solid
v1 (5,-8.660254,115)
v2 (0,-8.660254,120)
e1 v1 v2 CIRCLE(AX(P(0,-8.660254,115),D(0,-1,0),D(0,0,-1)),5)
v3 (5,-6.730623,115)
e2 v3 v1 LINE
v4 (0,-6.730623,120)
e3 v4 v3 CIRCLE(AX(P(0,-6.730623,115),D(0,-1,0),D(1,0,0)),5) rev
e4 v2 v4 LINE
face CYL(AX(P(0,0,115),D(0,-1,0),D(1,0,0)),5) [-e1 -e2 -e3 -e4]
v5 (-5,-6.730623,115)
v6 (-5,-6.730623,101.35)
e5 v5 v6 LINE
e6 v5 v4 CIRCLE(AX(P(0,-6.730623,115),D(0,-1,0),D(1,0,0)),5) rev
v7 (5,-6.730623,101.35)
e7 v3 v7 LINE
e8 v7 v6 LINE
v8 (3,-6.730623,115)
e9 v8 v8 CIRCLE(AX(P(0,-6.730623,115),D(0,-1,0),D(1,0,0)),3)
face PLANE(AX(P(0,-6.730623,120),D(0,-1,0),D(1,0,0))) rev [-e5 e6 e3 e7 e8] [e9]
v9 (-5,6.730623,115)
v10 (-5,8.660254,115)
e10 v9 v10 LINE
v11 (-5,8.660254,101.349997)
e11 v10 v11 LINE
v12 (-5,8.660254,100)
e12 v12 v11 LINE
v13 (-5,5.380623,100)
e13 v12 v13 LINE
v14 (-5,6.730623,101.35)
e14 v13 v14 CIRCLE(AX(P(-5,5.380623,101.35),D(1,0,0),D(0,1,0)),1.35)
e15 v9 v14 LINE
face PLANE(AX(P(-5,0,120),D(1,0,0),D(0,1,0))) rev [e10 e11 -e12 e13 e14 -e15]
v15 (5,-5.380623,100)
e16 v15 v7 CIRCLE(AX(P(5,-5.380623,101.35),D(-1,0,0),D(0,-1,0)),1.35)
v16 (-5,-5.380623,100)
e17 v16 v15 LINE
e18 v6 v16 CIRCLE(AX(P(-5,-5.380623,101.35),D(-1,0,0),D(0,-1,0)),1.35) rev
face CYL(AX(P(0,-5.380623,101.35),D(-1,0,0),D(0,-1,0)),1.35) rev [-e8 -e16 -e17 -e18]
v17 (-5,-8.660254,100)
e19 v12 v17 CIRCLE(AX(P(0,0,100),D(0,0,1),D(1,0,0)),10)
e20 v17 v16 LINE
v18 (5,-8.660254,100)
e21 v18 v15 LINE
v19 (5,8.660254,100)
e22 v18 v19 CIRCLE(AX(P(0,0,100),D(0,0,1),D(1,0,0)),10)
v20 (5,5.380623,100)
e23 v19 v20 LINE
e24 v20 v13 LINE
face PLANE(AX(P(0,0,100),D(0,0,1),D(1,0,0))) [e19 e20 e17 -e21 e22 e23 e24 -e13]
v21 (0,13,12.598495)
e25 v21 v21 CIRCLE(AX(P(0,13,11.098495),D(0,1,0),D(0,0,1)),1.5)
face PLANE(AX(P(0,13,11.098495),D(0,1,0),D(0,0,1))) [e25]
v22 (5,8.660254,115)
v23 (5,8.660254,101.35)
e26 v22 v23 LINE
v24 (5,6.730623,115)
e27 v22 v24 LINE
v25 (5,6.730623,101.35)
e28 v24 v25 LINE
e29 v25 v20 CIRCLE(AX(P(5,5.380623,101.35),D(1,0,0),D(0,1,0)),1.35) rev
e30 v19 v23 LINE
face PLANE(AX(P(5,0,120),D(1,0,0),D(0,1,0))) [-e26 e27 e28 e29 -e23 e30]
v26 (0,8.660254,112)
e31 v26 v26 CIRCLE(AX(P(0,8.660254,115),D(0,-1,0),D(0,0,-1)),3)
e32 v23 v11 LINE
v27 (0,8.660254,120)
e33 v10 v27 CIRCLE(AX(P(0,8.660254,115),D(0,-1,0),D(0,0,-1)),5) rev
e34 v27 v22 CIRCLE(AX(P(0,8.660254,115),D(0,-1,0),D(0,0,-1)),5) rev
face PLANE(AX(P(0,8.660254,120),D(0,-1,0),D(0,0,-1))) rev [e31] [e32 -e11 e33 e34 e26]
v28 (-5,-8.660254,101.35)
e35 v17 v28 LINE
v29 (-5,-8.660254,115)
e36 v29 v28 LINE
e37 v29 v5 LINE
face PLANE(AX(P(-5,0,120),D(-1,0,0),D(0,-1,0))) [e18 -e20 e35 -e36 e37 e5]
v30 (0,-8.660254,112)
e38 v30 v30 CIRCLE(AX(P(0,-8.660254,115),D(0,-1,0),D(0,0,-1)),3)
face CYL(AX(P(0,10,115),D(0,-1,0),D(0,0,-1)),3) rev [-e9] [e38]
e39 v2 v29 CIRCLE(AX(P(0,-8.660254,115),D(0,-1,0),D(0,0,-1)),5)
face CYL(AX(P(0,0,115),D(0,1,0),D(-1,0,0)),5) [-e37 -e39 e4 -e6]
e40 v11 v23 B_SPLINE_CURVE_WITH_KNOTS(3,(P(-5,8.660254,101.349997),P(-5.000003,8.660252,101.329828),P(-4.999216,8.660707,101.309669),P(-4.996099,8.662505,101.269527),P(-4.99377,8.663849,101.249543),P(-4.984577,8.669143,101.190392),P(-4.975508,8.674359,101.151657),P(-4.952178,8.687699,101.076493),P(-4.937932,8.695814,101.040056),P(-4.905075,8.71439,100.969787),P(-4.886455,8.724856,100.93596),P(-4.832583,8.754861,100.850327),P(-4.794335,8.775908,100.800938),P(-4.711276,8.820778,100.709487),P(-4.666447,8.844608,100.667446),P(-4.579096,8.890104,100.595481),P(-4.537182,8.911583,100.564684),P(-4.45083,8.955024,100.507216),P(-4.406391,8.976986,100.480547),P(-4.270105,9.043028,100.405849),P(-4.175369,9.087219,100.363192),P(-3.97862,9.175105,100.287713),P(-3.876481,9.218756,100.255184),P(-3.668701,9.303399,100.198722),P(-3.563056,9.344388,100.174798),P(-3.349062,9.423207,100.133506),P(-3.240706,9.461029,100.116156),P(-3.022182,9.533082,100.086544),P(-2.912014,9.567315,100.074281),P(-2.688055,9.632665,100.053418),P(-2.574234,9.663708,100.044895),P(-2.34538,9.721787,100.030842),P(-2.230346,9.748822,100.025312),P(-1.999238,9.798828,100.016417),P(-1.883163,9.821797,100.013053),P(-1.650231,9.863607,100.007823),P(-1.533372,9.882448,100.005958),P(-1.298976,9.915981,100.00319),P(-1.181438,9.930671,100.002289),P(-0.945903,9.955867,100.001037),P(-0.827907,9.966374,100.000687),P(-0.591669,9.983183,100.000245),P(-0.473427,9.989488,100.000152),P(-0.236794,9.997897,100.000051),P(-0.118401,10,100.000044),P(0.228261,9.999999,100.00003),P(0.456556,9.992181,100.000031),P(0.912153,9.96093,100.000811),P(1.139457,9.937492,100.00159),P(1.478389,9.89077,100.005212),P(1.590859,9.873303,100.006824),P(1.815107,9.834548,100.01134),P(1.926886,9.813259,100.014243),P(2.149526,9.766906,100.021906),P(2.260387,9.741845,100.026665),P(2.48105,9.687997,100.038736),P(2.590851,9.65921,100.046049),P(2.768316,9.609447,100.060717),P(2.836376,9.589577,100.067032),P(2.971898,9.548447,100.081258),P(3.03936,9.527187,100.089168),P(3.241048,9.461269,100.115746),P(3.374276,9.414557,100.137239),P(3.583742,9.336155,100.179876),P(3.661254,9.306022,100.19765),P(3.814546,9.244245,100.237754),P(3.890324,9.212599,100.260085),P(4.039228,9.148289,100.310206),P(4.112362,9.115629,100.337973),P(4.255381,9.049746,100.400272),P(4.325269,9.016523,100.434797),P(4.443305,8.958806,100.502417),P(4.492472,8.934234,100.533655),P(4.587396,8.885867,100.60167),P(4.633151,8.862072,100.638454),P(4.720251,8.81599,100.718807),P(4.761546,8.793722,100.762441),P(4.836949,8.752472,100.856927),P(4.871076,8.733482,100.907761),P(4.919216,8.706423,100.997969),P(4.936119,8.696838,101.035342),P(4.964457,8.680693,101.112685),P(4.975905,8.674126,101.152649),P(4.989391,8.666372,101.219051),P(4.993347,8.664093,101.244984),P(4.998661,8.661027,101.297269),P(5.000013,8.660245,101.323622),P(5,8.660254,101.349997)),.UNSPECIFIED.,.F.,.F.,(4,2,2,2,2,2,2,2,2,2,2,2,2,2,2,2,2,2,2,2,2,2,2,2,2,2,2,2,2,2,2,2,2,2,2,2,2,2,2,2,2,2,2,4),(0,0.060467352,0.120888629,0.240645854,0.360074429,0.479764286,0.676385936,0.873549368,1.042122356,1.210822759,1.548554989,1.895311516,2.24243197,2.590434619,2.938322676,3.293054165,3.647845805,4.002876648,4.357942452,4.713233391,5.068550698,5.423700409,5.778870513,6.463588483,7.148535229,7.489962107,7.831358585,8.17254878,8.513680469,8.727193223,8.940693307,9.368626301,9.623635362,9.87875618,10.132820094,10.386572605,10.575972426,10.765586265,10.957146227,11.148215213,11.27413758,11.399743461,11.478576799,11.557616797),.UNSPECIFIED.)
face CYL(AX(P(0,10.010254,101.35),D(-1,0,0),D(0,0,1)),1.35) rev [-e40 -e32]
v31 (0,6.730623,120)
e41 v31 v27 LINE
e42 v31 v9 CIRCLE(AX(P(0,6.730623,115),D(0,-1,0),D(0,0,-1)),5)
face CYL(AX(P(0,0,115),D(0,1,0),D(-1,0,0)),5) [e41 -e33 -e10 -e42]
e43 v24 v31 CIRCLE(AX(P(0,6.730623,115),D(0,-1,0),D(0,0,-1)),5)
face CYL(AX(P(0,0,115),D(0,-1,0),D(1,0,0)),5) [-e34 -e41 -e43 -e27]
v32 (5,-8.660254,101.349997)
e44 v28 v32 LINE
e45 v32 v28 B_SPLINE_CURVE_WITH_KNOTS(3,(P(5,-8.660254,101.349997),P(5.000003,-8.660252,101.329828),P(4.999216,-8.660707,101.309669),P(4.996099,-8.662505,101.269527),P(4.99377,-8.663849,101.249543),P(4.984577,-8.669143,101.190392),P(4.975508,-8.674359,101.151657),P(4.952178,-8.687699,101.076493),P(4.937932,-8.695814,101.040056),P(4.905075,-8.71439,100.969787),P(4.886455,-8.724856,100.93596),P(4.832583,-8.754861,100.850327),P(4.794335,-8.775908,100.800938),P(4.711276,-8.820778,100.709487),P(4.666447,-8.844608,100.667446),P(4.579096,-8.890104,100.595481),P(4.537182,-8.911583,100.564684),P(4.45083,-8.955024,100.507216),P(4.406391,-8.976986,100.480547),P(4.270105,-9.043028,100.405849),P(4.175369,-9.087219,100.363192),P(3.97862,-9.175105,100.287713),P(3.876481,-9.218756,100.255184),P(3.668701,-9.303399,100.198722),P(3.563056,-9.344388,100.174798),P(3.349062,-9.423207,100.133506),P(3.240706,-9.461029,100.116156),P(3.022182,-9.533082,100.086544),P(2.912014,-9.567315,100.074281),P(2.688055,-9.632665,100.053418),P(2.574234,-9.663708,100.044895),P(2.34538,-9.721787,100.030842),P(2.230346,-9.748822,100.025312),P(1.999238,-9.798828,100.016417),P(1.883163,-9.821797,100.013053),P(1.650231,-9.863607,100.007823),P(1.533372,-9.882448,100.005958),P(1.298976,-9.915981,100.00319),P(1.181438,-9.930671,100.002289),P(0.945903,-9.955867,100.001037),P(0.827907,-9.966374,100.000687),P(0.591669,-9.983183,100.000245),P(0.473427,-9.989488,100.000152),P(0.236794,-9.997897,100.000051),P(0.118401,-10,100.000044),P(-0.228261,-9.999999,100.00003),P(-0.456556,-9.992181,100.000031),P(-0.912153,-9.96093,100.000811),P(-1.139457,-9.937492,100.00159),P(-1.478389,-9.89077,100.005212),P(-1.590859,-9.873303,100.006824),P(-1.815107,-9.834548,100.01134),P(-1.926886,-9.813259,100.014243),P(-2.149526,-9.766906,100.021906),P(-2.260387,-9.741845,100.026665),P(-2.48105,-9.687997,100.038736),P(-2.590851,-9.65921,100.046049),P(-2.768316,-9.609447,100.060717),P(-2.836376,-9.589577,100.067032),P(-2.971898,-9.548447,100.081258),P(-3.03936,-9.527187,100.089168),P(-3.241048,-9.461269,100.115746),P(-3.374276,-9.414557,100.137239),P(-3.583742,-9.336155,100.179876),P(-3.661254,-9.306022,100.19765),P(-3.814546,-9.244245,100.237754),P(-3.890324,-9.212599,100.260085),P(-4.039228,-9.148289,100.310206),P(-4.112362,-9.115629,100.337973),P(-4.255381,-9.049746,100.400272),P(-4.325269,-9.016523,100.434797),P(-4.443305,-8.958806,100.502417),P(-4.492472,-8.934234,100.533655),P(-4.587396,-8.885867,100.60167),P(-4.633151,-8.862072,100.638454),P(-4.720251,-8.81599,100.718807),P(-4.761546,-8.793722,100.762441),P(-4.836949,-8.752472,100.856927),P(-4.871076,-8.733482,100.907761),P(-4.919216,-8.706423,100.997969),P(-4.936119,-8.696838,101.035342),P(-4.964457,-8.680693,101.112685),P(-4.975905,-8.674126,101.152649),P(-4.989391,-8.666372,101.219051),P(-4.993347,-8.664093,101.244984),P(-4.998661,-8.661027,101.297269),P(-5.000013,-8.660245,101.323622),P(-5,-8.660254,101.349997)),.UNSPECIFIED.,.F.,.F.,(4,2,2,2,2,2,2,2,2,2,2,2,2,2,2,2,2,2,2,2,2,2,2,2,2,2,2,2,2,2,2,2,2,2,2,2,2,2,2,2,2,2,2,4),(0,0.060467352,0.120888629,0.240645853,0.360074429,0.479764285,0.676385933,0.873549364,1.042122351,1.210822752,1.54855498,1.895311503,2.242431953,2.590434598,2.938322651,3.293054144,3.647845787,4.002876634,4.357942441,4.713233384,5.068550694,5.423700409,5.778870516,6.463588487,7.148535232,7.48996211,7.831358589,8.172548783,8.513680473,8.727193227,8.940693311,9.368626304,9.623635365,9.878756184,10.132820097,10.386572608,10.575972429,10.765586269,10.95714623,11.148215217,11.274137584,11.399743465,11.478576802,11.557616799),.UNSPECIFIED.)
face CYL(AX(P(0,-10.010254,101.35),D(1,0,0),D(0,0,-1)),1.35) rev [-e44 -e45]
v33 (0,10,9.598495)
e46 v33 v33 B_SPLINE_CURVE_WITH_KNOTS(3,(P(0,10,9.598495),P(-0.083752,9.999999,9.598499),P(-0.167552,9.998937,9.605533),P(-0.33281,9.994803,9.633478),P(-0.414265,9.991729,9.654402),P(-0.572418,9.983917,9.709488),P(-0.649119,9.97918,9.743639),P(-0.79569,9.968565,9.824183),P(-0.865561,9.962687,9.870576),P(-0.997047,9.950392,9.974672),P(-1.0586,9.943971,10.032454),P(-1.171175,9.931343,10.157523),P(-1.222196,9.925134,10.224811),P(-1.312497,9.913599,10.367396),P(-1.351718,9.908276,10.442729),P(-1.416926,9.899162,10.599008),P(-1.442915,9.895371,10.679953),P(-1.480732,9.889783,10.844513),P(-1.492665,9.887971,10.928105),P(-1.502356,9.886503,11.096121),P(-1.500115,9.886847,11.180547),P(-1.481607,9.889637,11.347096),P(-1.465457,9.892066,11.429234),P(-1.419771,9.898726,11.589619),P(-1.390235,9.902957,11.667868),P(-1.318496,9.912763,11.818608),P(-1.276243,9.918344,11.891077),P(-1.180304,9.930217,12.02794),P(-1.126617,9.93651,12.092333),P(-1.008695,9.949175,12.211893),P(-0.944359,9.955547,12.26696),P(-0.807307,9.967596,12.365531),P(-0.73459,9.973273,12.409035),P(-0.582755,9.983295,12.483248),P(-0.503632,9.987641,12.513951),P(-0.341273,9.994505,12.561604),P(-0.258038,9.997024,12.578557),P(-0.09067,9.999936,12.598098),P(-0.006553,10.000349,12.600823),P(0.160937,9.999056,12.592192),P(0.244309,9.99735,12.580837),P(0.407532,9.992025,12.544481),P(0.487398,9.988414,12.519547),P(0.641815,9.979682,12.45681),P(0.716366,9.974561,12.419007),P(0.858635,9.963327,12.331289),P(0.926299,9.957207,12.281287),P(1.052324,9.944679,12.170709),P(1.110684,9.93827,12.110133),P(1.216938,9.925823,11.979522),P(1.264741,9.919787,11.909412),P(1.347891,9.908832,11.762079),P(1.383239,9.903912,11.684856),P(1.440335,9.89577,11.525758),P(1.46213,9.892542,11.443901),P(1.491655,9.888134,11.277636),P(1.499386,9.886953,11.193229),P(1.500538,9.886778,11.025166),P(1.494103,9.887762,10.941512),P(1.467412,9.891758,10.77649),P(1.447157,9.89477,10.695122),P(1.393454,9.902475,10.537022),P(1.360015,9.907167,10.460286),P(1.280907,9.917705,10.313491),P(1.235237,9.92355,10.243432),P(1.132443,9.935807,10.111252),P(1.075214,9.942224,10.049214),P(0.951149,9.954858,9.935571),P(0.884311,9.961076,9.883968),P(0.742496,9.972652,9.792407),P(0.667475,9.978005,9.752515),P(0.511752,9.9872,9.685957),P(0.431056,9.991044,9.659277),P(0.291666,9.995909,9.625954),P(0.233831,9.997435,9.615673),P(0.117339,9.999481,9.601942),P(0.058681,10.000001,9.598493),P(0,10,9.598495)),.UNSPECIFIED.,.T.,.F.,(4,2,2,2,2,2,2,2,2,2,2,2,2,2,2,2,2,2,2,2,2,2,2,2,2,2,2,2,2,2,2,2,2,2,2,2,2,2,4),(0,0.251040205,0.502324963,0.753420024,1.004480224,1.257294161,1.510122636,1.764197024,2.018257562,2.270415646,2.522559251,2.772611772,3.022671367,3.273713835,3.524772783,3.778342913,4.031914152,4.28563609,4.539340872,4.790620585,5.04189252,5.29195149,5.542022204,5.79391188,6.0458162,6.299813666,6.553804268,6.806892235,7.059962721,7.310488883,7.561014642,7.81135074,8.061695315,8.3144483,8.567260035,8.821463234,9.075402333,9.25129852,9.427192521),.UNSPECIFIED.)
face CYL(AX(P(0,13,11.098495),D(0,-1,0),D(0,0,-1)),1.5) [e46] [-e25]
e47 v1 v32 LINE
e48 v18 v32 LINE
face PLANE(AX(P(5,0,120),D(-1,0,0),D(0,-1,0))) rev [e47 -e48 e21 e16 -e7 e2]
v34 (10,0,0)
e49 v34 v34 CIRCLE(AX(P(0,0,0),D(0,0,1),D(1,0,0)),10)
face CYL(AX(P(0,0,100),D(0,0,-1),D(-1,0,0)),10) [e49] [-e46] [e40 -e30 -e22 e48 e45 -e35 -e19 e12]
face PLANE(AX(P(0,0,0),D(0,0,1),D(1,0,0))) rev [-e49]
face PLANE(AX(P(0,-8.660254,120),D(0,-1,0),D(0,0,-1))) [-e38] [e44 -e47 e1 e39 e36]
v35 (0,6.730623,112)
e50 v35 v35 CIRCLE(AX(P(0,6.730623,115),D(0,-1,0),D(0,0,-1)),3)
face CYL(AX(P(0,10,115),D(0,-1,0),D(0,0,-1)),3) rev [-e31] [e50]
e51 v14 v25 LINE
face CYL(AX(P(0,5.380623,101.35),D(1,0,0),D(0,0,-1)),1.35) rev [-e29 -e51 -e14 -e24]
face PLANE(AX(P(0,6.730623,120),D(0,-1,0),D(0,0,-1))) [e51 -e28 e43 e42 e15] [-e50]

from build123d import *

# Parameters (mm, degrees)
SKETCH1_R           = 10
BOSS_EXTRUDE1_DEPTH = 100
SKETCH3_W           = 10
SKETCH3_H           = 1.929631273
BOSS_EXTRUDE3_DEPTH = 20
SKETCH4_R           = 3
CUT_EXTRUDE1_DEPTH  = 122.853211204
FILLET2_R           = 5
FILLET3_R           = 1.35
SKETCH7_R           = 1.5
BOSS_EXTRUDE4_DEPTH = 13


# Some blends are built 0.0001 mm under size
with BuildPart() as part:
    # Sketch1 → Boss-Extrude1 (new body)
    with BuildSketch(Plane(origin=(0, 0, 0), x_dir=(0, 1, 0), z_dir=(0, 0, 1))):
        with Locations(Location((0, 0, 0), (0, 0, 270))):
            Circle(SKETCH1_R)
    extrude(amount=BOSS_EXTRUDE1_DEPTH)

    # Sketch3 → Boss-Extrude3 (add)
    with BuildSketch(Plane.XY.offset(100)):
        with Locations((0, 7.695438402)):
            Rectangle(SKETCH3_W, SKETCH3_H)
        with Locations((0, -7.695438402)):
            Rectangle(SKETCH3_W, SKETCH3_H)
    extrude(amount=BOSS_EXTRUDE3_DEPTH)

    # Sketch4 → Cut-Extrude1 (cut, through all)
    with BuildSketch(Plane.XZ.offset(8.660254038)):
        with Locations(Location((0, 115, 0), (0, 0, 270))):
            Circle(SKETCH4_R)
    extrude(amount=-CUT_EXTRUDE1_DEPTH, mode=Mode.SUBTRACT)

    # Fillet2
    fillet2_edges = [part.edges().sort_by_distance(p)[0] for p in [
        (-5, 7.695438402, 120),
        (5, 7.695438402, 120),
        (-5, -7.695438402, 120),
        (5, -7.695438402, 120),
    ]]
    fillet(fillet2_edges, radius=FILLET2_R - 0.0001)  # a hair under: the kernel refuses the full size

    # Fillet3
    # the kernel refuses this fillet: 1.35 mm, written as the material it adds along each edge
    with BuildSketch(Plane(origin=(-5, -6.730622765, 100), x_dir=(0, 0, 1), z_dir=(1, 0, 0)), Plane(origin=(-5, 6.730622765, 100), x_dir=(0, -1, 0), z_dir=(1, 0, 0))) as fillet3_piece_1:
        with BuildLine():
            CenterArc((FILLET3_R, -FILLET3_R), FILLET3_R, 90, 90)
            Line((0, -FILLET3_R), (0, 0))
            Line((0, 0), (FILLET3_R, 0))
        make_face()
    extrude(amount=10)
    with BuildSketch(Plane(origin=(5, 8.660254038, 100), x_dir=(0, 1, 0), z_dir=(-1, 0, 0))) as fillet3_piece_2_section:
        with BuildLine():
            CenterArc((FILLET3_R, -FILLET3_R), FILLET3_R, 90, 90)
            Line((0, -FILLET3_R), (0, 0))
            Line((0, 0), (FILLET3_R, 0))
        make_face()
    fillet3_piece_2 = extrude(amount=10, mode=Mode.PRIVATE)
    fillet3_piece_2 = fillet3_piece_2 & Plane(origin=(0, 0, 100.331461228), x_dir=(1, 0, 0), z_dir=(0, 0, -1)) * Cylinder(10, 26, mode=Mode.PRIVATE)
    add(fillet3_piece_2)
    with BuildSketch(Plane(origin=(5, -8.660254038, 100), x_dir=(0, 0, 1), z_dir=(-1, 0, 0))) as fillet3_piece_3_section:
        with BuildLine():
            CenterArc((FILLET3_R, -FILLET3_R), FILLET3_R, 90, 90)
            Line((0, -FILLET3_R), (0, 0))
            Line((0, 0), (FILLET3_R, 0))
        make_face()
    fillet3_piece_3 = extrude(amount=10, mode=Mode.PRIVATE)
    fillet3_piece_3 = fillet3_piece_3 & Plane(origin=(0, 0, 100.331460994), x_dir=(1, 0, 0), z_dir=(0, 0, -1)) * Cylinder(10, 26, mode=Mode.PRIVATE)
    add(fillet3_piece_3)

    # Sketch7 → Boss-Extrude4 (add)
    with BuildSketch(Plane(origin=(0, 0, 0), x_dir=(-1, 0, 0), z_dir=(0, 1, 0))):
        with Locations(Location((0, 11.098495107, 0), (0, 0, 270))):
            Circle(SKETCH7_R)
    extrude(amount=BOSS_EXTRUDE4_DEPTH)


solid = part.part
